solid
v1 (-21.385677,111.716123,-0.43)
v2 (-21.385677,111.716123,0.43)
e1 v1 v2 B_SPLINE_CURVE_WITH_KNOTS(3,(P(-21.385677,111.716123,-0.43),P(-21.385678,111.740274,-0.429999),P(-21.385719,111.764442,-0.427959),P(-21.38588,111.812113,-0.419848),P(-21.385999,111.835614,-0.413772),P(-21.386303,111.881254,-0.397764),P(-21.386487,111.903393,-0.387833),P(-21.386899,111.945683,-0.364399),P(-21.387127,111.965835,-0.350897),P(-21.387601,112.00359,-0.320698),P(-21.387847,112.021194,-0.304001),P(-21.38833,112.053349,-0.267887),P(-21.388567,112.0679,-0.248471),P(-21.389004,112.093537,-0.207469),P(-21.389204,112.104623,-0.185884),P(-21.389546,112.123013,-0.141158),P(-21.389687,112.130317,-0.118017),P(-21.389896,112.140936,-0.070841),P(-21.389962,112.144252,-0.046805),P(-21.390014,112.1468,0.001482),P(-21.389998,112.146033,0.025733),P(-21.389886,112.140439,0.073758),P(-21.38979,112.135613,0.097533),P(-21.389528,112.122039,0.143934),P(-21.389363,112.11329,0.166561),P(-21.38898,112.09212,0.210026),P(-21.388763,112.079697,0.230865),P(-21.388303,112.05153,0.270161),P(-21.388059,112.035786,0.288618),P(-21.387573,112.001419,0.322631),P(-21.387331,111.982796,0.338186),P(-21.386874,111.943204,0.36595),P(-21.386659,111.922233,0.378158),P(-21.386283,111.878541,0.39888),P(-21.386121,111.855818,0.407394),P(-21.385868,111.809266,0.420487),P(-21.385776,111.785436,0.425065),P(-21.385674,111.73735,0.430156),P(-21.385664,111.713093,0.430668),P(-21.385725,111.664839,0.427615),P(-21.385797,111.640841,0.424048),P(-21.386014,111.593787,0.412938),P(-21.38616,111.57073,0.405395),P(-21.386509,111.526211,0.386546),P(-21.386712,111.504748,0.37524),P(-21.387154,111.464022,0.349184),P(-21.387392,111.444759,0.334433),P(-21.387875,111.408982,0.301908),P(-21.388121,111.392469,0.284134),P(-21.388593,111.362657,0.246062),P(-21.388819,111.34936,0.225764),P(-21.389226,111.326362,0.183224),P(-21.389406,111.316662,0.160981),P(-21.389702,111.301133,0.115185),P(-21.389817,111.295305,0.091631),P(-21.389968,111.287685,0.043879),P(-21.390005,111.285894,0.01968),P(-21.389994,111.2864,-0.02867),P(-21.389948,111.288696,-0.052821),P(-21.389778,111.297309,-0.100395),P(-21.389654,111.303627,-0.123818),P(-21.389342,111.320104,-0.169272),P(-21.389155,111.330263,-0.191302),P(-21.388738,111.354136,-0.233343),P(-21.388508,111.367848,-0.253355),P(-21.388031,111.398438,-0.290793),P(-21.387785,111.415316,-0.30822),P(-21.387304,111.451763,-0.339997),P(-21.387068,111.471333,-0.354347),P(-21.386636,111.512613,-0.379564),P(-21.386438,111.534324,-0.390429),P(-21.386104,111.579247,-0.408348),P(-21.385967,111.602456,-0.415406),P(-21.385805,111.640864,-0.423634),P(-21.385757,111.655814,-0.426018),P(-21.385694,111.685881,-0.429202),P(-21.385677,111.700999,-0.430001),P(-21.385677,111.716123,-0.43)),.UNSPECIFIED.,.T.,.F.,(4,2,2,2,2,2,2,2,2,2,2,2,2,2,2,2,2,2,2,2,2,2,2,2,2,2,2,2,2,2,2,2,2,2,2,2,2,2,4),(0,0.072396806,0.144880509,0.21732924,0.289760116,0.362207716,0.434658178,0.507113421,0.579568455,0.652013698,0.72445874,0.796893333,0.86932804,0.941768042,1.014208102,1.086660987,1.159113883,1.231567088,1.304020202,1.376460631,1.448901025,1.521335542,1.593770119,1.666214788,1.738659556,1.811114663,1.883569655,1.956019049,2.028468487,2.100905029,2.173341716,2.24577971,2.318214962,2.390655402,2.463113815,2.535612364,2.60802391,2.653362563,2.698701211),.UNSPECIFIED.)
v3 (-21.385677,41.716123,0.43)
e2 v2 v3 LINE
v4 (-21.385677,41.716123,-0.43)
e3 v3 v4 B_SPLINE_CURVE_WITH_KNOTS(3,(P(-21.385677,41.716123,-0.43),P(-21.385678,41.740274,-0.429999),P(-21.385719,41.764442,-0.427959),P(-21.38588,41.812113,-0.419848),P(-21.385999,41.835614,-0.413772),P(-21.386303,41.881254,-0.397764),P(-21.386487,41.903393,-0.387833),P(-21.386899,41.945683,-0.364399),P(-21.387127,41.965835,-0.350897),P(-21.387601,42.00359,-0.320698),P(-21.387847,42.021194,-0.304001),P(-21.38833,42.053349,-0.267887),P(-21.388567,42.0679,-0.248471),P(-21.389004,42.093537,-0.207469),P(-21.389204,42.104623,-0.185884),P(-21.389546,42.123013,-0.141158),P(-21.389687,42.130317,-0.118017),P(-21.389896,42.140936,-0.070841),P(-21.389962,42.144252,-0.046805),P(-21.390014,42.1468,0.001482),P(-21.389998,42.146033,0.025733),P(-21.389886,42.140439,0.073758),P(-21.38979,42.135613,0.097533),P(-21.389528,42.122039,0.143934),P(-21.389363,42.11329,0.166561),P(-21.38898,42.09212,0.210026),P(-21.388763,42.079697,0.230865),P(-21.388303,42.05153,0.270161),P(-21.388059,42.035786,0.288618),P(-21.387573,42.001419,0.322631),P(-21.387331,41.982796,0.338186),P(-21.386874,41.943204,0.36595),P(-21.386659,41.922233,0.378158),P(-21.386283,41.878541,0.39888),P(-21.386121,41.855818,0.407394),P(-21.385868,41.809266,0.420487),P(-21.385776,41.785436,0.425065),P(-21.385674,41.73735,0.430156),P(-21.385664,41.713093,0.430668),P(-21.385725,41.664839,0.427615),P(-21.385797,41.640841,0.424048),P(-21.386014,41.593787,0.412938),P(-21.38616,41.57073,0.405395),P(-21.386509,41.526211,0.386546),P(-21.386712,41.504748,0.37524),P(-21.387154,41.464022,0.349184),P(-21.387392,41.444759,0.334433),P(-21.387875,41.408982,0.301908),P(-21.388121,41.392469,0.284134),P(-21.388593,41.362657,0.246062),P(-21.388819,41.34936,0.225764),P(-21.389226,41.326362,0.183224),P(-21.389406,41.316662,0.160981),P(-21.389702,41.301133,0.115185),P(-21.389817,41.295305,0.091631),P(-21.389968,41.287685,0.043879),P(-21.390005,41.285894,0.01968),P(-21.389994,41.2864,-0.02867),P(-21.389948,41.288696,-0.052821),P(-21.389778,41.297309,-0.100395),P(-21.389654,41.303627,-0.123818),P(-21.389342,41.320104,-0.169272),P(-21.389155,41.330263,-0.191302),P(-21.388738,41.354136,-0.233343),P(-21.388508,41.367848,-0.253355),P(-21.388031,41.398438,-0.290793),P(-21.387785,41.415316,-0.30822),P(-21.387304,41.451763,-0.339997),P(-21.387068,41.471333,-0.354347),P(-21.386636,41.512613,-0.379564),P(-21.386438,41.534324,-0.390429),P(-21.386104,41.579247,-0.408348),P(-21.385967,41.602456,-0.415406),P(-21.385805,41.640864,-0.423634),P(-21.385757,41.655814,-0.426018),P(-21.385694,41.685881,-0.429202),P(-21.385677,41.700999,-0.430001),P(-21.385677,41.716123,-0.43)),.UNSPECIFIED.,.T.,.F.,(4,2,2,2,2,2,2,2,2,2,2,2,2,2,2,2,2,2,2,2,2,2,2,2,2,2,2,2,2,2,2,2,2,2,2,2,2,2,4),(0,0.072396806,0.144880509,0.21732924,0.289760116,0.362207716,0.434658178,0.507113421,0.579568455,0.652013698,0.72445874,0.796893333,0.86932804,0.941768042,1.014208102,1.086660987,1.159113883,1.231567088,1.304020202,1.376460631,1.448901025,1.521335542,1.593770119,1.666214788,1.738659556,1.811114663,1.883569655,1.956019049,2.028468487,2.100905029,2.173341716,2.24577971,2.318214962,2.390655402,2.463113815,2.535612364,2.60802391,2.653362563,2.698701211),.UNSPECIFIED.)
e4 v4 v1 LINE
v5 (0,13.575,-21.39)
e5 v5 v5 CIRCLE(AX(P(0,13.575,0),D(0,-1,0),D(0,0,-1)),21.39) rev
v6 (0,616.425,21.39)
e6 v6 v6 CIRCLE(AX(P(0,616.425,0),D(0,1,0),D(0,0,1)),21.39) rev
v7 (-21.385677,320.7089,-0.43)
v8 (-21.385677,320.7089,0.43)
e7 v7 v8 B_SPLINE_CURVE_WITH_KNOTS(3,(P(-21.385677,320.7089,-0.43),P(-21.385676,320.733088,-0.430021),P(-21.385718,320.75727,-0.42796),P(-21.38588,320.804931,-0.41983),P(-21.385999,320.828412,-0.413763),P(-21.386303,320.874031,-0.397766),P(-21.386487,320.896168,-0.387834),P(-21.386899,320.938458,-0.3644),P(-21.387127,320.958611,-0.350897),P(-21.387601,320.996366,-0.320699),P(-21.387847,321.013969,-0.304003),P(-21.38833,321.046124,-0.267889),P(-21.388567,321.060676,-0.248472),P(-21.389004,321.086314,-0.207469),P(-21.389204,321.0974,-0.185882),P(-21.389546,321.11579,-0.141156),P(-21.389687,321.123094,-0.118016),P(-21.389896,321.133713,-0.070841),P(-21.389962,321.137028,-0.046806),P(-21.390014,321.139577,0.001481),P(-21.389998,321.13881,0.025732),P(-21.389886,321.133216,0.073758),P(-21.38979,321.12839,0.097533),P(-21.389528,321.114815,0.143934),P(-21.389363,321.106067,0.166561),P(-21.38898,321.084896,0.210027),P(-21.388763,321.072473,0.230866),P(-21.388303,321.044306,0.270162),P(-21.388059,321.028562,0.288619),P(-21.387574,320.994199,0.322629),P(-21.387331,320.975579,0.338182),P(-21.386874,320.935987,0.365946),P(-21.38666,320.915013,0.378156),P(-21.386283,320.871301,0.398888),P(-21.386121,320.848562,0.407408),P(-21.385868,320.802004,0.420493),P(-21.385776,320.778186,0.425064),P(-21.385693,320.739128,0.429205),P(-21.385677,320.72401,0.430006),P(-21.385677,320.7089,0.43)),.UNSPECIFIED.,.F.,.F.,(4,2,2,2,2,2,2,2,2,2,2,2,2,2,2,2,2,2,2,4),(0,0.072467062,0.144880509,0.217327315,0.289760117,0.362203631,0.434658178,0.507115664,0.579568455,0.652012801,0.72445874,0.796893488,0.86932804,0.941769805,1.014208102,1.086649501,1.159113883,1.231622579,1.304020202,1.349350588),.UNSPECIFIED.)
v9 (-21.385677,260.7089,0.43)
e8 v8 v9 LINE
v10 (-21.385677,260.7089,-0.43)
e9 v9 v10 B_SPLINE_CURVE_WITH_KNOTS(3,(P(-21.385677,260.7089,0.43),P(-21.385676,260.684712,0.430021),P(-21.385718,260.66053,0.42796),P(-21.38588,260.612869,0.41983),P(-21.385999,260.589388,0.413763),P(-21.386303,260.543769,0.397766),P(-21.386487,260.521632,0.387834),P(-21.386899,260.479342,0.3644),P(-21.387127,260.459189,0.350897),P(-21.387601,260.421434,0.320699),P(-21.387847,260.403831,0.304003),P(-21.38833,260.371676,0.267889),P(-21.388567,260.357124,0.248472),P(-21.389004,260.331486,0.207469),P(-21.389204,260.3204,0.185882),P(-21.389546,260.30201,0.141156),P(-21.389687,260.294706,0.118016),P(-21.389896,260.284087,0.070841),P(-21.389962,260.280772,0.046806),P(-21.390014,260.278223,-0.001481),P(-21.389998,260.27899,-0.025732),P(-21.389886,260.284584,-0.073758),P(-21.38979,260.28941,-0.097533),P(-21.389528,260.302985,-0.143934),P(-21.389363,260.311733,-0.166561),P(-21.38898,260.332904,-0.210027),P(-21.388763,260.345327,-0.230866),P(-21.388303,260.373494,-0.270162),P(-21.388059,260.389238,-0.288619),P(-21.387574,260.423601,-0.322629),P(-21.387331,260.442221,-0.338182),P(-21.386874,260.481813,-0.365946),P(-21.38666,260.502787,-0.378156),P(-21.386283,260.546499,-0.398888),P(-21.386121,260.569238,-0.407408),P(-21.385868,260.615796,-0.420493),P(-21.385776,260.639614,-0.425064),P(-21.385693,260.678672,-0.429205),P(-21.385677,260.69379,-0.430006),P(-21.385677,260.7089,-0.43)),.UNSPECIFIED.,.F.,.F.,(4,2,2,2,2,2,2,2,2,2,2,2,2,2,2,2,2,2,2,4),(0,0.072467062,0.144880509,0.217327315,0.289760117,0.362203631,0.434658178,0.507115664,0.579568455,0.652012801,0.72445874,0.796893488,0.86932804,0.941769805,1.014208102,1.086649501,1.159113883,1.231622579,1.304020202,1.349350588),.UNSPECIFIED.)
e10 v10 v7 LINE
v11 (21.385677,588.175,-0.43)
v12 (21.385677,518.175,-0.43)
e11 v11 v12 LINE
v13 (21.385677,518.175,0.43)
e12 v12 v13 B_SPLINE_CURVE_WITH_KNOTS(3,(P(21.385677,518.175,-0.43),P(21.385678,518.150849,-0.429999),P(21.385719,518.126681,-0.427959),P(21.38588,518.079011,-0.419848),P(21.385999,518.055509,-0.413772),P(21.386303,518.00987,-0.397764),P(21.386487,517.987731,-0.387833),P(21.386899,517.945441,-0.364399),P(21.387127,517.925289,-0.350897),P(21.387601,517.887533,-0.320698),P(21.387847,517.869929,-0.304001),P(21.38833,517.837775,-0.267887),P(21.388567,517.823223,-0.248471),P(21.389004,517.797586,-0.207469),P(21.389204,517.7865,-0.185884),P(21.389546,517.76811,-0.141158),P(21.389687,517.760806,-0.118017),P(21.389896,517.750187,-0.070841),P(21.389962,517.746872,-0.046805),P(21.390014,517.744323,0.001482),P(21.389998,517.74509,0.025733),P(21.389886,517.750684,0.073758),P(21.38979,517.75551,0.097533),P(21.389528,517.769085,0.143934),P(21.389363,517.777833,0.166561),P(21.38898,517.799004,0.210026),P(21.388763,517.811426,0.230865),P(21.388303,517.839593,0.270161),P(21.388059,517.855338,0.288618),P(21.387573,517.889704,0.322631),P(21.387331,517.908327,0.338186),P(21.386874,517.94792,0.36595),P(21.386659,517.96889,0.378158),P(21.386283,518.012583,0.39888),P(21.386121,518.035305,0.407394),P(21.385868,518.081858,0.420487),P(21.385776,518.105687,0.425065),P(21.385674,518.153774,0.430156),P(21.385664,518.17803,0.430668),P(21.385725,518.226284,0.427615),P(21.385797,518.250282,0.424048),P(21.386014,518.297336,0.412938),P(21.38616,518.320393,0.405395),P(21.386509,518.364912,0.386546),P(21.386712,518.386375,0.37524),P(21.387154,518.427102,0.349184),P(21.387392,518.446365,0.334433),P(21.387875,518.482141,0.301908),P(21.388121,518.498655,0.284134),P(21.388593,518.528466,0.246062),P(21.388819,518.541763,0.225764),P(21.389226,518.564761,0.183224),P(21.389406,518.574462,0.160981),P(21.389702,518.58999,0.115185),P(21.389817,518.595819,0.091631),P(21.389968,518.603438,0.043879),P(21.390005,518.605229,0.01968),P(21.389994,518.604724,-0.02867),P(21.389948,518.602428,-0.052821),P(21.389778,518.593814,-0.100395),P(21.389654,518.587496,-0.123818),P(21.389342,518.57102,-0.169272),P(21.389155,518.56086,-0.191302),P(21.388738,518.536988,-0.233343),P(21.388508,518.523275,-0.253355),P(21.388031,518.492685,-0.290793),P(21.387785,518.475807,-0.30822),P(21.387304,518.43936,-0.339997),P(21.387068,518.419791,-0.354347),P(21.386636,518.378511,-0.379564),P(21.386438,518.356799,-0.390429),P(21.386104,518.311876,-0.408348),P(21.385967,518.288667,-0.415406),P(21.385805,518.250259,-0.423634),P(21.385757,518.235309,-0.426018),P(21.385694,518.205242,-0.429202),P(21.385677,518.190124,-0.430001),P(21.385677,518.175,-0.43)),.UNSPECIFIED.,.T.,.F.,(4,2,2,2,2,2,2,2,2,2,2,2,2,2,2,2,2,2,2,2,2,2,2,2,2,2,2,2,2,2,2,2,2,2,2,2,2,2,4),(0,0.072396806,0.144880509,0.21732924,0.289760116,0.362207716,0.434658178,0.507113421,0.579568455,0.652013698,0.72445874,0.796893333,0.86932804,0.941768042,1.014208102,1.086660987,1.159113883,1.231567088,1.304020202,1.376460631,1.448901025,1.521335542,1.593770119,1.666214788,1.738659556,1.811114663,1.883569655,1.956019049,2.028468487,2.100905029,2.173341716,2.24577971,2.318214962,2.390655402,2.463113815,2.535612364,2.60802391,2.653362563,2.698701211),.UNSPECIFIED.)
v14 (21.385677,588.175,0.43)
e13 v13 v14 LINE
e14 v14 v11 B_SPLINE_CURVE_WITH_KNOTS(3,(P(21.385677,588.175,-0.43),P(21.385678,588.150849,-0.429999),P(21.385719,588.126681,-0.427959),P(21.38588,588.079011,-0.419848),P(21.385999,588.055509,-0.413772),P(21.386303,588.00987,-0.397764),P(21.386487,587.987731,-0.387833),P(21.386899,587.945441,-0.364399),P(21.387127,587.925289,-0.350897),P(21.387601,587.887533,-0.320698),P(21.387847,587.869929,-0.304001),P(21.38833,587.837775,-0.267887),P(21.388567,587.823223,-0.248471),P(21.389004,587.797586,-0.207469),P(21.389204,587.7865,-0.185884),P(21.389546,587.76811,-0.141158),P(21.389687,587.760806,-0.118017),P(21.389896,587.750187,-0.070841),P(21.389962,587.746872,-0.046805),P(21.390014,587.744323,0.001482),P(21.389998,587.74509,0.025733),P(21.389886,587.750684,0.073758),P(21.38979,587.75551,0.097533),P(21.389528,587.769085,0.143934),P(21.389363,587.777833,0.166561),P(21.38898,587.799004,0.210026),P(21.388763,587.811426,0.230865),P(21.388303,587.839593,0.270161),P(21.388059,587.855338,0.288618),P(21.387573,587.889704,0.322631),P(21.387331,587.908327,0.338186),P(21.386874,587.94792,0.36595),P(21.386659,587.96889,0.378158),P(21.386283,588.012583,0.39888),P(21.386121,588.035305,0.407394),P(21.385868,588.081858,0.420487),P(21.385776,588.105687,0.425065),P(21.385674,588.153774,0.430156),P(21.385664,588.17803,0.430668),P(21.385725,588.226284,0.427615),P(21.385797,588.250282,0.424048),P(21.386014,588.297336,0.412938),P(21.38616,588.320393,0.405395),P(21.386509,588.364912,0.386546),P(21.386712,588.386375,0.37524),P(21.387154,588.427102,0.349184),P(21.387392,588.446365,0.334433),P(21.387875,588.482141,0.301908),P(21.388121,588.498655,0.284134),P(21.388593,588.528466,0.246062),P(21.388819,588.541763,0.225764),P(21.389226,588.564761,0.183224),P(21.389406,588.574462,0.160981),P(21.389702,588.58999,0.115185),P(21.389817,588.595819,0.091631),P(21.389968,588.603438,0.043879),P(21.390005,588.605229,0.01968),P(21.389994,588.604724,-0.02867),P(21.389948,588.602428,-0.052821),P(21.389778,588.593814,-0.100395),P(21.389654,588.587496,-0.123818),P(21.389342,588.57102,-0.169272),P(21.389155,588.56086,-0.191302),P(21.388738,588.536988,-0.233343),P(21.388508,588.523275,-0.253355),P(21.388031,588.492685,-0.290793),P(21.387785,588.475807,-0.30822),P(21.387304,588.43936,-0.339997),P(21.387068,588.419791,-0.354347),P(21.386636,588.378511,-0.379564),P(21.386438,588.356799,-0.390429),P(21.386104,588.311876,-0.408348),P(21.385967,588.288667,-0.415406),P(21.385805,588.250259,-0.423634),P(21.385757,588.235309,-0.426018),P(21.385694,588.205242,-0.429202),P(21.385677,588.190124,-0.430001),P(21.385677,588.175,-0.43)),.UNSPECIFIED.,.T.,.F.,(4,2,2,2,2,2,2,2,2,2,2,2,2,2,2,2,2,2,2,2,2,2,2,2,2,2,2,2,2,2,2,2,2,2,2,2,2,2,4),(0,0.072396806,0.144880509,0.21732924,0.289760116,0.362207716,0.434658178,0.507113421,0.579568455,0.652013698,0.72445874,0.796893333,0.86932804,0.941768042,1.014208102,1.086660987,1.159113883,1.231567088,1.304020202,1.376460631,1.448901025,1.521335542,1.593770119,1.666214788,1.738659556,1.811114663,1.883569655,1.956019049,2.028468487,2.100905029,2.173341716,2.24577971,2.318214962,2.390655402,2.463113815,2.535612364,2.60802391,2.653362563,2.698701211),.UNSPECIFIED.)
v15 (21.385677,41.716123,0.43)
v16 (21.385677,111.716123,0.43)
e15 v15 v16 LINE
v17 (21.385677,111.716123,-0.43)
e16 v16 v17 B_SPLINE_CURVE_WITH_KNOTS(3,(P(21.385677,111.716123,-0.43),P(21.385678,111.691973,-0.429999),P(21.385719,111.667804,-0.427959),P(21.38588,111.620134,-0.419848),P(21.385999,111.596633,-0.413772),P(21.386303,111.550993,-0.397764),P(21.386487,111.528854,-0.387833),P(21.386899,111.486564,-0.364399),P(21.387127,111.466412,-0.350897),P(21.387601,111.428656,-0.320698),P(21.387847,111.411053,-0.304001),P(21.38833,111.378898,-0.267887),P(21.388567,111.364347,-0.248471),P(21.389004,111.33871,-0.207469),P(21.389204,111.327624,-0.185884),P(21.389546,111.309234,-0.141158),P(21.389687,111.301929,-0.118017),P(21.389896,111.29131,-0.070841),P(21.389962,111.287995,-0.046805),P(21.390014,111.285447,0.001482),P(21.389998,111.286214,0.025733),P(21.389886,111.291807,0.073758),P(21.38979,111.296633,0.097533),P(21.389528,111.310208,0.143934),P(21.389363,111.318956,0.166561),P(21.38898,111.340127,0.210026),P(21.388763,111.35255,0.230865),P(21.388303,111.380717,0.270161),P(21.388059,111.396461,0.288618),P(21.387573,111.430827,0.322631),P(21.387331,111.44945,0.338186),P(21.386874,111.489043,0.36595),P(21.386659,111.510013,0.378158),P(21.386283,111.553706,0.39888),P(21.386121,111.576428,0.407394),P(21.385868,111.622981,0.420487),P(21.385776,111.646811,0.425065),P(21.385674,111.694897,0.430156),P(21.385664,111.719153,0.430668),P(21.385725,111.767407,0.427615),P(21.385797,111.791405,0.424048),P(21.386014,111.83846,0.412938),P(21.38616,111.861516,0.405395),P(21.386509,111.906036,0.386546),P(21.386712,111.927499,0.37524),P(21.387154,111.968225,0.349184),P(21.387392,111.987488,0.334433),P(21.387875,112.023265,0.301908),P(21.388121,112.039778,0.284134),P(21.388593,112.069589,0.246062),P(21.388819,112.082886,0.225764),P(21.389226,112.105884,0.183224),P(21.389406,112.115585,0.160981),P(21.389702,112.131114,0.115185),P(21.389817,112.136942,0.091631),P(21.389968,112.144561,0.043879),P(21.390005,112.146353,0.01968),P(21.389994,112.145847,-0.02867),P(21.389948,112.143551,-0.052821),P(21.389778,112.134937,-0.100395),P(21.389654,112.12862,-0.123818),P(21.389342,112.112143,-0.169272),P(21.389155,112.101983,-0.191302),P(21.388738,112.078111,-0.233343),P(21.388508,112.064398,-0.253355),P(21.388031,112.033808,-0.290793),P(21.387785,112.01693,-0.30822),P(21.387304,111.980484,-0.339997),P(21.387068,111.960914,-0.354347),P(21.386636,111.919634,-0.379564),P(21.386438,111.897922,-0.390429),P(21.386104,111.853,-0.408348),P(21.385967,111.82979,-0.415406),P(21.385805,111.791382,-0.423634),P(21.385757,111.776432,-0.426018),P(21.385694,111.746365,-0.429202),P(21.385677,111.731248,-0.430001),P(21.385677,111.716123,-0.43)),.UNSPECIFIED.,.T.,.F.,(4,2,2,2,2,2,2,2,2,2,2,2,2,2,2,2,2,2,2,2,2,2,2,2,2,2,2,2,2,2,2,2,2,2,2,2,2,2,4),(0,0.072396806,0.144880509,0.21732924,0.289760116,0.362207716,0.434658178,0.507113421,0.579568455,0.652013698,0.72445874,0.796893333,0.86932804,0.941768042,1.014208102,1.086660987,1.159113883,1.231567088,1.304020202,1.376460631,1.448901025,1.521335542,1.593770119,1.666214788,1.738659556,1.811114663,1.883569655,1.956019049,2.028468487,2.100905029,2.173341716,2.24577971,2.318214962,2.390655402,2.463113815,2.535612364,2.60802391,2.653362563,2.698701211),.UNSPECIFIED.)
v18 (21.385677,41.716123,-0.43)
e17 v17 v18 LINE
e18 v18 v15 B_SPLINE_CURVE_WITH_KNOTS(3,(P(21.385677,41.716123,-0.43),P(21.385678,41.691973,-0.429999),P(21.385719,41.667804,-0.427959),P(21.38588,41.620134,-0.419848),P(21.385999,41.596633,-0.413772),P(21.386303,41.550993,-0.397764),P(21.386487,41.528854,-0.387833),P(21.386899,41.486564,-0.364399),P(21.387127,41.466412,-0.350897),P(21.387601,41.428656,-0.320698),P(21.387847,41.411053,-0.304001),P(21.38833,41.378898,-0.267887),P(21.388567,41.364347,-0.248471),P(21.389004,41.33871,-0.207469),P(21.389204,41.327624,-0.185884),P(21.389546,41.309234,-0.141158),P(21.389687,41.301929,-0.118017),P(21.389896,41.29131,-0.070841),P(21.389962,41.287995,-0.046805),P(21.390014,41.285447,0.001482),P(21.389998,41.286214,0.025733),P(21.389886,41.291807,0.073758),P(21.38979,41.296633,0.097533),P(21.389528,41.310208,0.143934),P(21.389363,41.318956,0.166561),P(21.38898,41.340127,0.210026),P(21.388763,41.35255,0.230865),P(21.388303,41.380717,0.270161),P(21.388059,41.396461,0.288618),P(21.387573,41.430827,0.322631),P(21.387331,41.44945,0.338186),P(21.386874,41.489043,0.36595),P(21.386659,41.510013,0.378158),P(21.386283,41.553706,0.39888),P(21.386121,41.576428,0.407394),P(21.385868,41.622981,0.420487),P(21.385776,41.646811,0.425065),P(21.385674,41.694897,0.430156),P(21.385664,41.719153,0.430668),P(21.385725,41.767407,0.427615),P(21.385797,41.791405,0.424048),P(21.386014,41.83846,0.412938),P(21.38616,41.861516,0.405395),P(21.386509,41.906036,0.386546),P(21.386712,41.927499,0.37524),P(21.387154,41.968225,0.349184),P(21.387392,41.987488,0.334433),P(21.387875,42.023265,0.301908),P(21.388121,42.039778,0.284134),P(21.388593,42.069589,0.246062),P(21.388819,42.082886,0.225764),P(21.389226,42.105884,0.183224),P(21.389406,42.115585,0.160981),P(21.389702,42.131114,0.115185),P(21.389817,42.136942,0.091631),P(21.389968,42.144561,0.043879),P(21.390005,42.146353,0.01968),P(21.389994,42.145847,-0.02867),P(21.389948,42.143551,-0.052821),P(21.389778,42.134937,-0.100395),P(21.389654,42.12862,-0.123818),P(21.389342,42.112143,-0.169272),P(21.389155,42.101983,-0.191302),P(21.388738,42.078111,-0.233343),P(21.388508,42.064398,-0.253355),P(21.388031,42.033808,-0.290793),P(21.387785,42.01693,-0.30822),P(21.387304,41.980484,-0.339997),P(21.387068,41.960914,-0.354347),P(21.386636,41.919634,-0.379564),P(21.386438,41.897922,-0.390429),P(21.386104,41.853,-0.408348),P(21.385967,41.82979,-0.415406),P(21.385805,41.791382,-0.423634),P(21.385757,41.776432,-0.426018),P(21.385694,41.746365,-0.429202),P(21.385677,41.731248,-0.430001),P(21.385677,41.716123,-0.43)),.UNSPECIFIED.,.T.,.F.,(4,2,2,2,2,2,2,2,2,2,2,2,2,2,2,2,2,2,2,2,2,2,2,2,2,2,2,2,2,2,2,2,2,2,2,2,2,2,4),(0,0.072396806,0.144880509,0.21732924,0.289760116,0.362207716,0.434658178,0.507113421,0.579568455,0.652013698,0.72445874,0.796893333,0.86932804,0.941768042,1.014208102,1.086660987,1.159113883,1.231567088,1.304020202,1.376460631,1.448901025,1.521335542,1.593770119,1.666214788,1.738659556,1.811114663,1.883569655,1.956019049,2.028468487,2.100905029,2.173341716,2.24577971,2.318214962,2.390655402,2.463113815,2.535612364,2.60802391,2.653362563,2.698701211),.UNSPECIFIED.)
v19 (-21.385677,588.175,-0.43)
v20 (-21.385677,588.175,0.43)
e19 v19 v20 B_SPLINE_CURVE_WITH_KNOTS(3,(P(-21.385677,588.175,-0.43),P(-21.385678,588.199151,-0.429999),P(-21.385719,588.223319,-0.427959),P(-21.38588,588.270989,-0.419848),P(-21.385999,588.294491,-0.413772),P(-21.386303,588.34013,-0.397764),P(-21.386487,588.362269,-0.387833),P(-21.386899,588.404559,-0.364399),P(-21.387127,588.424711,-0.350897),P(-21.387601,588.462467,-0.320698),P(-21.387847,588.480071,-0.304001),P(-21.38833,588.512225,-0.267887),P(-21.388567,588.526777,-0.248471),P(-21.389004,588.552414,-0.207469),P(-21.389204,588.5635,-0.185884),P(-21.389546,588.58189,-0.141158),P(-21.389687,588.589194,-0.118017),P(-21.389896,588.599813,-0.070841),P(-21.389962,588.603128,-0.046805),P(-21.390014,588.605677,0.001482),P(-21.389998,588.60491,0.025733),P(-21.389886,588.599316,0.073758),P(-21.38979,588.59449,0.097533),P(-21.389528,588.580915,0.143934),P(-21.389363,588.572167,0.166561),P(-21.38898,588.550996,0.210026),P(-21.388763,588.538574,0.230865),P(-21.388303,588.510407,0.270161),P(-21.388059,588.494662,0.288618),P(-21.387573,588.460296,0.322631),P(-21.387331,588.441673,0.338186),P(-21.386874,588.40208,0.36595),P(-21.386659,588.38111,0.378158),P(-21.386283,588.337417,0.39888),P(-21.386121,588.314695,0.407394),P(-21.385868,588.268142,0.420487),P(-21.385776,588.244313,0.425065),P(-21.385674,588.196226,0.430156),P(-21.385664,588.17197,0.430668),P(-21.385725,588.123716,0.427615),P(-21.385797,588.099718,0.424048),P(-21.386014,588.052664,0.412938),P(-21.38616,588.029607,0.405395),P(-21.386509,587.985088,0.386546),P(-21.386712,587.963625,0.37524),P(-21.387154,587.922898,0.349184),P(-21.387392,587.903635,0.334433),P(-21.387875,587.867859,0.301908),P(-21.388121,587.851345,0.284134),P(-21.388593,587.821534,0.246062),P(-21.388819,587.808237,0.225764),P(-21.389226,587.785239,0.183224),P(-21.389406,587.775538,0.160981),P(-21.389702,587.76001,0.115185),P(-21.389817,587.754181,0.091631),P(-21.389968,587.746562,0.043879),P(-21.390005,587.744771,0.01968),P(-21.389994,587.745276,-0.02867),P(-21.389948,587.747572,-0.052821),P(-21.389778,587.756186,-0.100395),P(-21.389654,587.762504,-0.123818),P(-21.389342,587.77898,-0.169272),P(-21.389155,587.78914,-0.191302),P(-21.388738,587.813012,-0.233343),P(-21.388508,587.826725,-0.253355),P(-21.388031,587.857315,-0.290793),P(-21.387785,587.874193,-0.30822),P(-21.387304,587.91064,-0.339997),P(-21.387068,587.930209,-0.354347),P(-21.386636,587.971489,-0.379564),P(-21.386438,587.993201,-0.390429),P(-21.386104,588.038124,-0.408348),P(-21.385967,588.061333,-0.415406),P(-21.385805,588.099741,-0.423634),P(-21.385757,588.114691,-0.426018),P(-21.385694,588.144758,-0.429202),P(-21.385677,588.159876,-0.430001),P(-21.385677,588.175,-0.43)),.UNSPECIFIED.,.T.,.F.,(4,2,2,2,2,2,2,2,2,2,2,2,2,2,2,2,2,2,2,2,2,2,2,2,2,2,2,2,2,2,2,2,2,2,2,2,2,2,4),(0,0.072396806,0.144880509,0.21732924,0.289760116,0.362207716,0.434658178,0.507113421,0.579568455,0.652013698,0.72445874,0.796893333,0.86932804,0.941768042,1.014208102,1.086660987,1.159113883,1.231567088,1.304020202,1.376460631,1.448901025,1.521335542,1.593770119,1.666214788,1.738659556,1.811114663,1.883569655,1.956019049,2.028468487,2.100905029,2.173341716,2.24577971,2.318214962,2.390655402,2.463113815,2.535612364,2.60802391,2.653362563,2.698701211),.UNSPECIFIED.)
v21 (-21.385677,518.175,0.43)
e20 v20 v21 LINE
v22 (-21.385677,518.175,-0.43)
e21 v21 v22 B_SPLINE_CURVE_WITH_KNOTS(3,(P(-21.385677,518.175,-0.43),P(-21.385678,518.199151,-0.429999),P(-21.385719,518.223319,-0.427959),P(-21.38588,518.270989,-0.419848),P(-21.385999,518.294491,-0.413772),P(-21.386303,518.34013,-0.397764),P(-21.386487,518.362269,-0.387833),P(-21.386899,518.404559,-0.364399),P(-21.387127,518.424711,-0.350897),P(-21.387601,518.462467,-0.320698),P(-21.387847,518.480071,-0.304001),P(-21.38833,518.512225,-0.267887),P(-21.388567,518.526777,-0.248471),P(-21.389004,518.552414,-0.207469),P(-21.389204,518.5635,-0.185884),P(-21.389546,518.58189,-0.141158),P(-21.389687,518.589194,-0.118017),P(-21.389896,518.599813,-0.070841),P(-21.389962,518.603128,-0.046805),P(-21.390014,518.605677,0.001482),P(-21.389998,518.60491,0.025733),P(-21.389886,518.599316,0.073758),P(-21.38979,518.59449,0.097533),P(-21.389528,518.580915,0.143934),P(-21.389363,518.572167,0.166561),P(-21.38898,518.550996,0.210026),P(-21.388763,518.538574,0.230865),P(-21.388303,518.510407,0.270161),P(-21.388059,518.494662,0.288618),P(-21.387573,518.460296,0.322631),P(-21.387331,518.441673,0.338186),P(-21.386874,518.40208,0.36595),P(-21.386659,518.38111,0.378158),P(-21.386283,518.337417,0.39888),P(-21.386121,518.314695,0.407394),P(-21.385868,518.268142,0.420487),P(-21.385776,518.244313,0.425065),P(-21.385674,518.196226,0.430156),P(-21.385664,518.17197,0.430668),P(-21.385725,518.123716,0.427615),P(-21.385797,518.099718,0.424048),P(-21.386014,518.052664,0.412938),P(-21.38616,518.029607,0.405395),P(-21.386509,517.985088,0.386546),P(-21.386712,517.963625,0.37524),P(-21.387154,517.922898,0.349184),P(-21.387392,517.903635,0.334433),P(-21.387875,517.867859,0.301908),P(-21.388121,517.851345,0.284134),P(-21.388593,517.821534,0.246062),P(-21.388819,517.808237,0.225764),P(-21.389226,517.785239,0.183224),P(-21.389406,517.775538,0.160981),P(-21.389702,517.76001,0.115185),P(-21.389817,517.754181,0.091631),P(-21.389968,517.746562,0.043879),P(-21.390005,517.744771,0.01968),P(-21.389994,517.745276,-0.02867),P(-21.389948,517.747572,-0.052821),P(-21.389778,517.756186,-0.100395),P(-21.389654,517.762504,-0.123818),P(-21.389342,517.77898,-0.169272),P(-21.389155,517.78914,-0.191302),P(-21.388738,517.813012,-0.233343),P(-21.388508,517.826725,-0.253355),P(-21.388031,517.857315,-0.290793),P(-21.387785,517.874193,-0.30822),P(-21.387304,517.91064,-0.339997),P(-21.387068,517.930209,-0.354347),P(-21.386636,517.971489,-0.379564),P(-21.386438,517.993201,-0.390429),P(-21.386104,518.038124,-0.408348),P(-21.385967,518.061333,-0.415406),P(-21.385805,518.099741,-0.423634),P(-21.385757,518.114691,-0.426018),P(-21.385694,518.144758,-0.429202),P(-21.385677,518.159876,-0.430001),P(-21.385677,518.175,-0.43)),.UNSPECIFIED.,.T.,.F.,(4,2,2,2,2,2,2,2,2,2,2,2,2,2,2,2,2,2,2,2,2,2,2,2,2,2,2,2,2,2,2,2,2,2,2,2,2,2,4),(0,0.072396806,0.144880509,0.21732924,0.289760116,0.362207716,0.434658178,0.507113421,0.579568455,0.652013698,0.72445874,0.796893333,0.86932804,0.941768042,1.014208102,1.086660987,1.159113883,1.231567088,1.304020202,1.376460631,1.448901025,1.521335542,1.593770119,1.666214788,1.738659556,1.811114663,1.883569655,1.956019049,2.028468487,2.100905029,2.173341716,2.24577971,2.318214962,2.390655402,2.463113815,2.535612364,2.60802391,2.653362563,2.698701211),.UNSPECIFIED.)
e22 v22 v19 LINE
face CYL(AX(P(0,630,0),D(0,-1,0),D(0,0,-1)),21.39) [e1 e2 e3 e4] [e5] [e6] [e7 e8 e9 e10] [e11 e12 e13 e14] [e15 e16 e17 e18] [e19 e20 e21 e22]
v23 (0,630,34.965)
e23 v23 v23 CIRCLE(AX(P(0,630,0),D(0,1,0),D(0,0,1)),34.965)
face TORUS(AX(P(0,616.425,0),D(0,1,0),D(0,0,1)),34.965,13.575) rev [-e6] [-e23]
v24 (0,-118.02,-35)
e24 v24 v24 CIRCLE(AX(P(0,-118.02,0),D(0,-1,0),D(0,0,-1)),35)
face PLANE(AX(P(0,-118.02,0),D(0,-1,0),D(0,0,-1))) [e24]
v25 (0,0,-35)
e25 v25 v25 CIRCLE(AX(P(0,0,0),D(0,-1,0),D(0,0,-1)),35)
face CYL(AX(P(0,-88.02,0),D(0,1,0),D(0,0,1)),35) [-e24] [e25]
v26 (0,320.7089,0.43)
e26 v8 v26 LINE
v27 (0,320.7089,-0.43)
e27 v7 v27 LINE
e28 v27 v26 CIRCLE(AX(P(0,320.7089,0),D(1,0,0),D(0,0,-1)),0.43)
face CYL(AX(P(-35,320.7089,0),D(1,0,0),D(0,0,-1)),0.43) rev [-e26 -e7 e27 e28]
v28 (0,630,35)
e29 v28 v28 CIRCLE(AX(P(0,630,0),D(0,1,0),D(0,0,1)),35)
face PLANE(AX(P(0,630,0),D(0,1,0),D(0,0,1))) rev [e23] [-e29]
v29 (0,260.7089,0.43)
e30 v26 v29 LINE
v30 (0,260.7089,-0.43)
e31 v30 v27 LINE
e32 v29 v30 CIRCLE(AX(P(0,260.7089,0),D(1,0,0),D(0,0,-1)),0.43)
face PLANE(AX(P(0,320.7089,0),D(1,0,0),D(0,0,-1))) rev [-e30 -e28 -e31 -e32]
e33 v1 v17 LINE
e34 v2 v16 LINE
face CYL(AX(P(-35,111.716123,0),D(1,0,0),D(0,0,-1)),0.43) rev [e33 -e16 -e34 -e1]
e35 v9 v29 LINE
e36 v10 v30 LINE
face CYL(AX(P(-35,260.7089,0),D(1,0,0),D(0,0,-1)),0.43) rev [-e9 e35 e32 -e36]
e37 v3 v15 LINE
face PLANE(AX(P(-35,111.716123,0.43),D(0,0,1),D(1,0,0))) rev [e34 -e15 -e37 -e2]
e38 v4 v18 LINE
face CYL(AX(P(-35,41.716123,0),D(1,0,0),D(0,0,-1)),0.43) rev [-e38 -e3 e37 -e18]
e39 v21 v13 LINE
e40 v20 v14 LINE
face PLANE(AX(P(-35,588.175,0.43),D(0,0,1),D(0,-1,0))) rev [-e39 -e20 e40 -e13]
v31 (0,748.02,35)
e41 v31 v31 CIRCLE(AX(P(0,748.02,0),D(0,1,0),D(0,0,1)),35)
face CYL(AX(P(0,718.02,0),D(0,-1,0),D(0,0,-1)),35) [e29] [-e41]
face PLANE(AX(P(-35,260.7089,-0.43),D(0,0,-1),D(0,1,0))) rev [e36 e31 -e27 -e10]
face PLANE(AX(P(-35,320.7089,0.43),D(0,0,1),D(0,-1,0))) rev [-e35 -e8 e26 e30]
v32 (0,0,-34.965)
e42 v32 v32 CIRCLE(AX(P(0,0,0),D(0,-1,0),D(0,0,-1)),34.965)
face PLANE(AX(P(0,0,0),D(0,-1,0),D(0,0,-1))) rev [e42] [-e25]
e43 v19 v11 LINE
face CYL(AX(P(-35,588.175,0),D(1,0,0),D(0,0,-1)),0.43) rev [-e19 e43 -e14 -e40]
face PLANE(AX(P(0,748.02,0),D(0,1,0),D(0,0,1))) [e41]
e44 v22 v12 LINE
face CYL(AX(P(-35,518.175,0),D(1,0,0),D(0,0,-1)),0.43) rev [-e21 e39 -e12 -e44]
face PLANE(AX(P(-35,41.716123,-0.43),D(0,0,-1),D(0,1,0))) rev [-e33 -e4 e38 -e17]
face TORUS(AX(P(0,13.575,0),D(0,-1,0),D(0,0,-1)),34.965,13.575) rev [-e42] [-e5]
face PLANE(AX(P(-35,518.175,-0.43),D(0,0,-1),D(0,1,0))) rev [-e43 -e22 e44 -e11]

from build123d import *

# Parameters (mm, degrees)
SKETCH1_R               = 21.39
BOSS_EXTRUDE1_DEPTH     = 630
SKETCH2_R               = 35
BOSS_EXTRUDE2_DEPTH     = 88.02
BOSS_EXTRUDE3_START     = 88.02
SKETCH3_R               = 35
BOSS_EXTRUDE3_DEPTH     = 88.02
FILLET3_R               = 13.575
MOVE_FACE1_BY           = 30
MOVE_FACE2_BY           = 30
CUT_EXTRUDE1_DEPTH      = 750.655867982
CUT_EXTRUDE1_DEPTH_BACK = 750.655867982
CUT_EXTRUDE2_START      = -21.390000045
CUT_EXTRUDE2_DEPTH      = 21.390000045


# Read off the part's stored shape, not the designer's step: Cut-Extrude2
with BuildPart() as part:
    # Sketch1 → Boss-Extrude1 (new body)
    with BuildSketch(Plane(origin=(0, 0, 0), x_dir=(1, 0, 0), z_dir=(0, 1, 0))):
        with Locations(Location((0, 0, 0), (0, 0, 270))):
            Circle(SKETCH1_R)
    extrude(amount=BOSS_EXTRUDE1_DEPTH)

    # Sketch2 → Boss-Extrude2 (add)
    with BuildSketch(Plane(origin=(0, 630, 0), x_dir=(1, 0, 0), z_dir=(0, 1, 0))):
        with Locations(Location((0, 0, 0), (0, 0, 270))):
            Circle(SKETCH2_R)
    extrude(amount=BOSS_EXTRUDE2_DEPTH)

    # Sketch3 → Boss-Extrude3 (add)
    with BuildSketch(Plane.XZ.offset(BOSS_EXTRUDE3_START)):
        with Locations(Location((0, 0, 0), (0, 0, 90))):
            Circle(SKETCH3_R)
    extrude(amount=-BOSS_EXTRUDE3_DEPTH)

    # Fillet3
    fillet3_edges = [part.edges().sort_by_distance(p)[0] for p in [
        (0, 630, -21.39),
        (0, 0, -21.39),
    ]]
    fillet(fillet3_edges, radius=FILLET3_R)

    # Move Face1: a face moved outward by 30.0
    extrude(part.faces().sort_by_distance((0, 718.02, 0))[0], amount=MOVE_FACE1_BY, dir=(0, 1, 0))

    # Move Face2: a face moved outward by 30.0
    extrude(part.faces().sort_by_distance((0, -88.02, 0))[0], amount=MOVE_FACE2_BY, dir=(0, -1, 0))

    # Sketch4 → Cut-Extrude1 (cut, two sides: drawn at the far end of the back side and taken through both)
    with BuildSketch(Plane(origin=(0, 0, 0), x_dir=(0, 0, -1), z_dir=(1, 0, 0)).offset(-CUT_EXTRUDE1_DEPTH_BACK)):
        with BuildLine():
            Line((-0.43, 588.175), (-0.43, 518.175))
            ThreePointArc((-0.43, 518.175), (0, 517.745), (0.43, 518.175))
            Line((0.43, 518.175), (0.43, 588.175))
            ThreePointArc((0.43, 588.175), (0, 588.605), (-0.43, 588.175))
        make_face()
        with BuildLine():
            Line((-0.43, 111.71612329), (-0.43, 41.71612329))
            ThreePointArc((-0.43, 41.71612329), (0, 41.28612329), (0.43, 41.71612329))
            Line((0.43, 41.71612329), (0.43, 111.71612329))
            ThreePointArc((0.43, 111.71612329), (0, 112.14612329), (-0.43, 111.71612329))
        make_face()
    extrude(amount=CUT_EXTRUDE1_DEPTH + CUT_EXTRUDE1_DEPTH_BACK, mode=Mode.SUBTRACT)

    # Cut-Extrude2 outline → Cut-Extrude2 (cut)
    with BuildSketch(Plane(origin=(0, 0, 0), x_dir=(0, 0, -1), z_dir=(1, 0, 0)).offset(CUT_EXTRUDE2_START)):
        with BuildLine():
            ThreePointArc((-0.43, 260.7089), (0, 260.2789), (0.43, 260.7089))
            Line((0.43, 260.7089), (0.43, 320.7089))
            ThreePointArc((0.43, 320.7089), (0, 321.1389), (-0.43, 320.7089))
            Line((-0.43, 320.7089), (-0.43, 260.7089))
        make_face()
    extrude(amount=CUT_EXTRUDE2_DEPTH, mode=Mode.SUBTRACT)


solid = part.part
